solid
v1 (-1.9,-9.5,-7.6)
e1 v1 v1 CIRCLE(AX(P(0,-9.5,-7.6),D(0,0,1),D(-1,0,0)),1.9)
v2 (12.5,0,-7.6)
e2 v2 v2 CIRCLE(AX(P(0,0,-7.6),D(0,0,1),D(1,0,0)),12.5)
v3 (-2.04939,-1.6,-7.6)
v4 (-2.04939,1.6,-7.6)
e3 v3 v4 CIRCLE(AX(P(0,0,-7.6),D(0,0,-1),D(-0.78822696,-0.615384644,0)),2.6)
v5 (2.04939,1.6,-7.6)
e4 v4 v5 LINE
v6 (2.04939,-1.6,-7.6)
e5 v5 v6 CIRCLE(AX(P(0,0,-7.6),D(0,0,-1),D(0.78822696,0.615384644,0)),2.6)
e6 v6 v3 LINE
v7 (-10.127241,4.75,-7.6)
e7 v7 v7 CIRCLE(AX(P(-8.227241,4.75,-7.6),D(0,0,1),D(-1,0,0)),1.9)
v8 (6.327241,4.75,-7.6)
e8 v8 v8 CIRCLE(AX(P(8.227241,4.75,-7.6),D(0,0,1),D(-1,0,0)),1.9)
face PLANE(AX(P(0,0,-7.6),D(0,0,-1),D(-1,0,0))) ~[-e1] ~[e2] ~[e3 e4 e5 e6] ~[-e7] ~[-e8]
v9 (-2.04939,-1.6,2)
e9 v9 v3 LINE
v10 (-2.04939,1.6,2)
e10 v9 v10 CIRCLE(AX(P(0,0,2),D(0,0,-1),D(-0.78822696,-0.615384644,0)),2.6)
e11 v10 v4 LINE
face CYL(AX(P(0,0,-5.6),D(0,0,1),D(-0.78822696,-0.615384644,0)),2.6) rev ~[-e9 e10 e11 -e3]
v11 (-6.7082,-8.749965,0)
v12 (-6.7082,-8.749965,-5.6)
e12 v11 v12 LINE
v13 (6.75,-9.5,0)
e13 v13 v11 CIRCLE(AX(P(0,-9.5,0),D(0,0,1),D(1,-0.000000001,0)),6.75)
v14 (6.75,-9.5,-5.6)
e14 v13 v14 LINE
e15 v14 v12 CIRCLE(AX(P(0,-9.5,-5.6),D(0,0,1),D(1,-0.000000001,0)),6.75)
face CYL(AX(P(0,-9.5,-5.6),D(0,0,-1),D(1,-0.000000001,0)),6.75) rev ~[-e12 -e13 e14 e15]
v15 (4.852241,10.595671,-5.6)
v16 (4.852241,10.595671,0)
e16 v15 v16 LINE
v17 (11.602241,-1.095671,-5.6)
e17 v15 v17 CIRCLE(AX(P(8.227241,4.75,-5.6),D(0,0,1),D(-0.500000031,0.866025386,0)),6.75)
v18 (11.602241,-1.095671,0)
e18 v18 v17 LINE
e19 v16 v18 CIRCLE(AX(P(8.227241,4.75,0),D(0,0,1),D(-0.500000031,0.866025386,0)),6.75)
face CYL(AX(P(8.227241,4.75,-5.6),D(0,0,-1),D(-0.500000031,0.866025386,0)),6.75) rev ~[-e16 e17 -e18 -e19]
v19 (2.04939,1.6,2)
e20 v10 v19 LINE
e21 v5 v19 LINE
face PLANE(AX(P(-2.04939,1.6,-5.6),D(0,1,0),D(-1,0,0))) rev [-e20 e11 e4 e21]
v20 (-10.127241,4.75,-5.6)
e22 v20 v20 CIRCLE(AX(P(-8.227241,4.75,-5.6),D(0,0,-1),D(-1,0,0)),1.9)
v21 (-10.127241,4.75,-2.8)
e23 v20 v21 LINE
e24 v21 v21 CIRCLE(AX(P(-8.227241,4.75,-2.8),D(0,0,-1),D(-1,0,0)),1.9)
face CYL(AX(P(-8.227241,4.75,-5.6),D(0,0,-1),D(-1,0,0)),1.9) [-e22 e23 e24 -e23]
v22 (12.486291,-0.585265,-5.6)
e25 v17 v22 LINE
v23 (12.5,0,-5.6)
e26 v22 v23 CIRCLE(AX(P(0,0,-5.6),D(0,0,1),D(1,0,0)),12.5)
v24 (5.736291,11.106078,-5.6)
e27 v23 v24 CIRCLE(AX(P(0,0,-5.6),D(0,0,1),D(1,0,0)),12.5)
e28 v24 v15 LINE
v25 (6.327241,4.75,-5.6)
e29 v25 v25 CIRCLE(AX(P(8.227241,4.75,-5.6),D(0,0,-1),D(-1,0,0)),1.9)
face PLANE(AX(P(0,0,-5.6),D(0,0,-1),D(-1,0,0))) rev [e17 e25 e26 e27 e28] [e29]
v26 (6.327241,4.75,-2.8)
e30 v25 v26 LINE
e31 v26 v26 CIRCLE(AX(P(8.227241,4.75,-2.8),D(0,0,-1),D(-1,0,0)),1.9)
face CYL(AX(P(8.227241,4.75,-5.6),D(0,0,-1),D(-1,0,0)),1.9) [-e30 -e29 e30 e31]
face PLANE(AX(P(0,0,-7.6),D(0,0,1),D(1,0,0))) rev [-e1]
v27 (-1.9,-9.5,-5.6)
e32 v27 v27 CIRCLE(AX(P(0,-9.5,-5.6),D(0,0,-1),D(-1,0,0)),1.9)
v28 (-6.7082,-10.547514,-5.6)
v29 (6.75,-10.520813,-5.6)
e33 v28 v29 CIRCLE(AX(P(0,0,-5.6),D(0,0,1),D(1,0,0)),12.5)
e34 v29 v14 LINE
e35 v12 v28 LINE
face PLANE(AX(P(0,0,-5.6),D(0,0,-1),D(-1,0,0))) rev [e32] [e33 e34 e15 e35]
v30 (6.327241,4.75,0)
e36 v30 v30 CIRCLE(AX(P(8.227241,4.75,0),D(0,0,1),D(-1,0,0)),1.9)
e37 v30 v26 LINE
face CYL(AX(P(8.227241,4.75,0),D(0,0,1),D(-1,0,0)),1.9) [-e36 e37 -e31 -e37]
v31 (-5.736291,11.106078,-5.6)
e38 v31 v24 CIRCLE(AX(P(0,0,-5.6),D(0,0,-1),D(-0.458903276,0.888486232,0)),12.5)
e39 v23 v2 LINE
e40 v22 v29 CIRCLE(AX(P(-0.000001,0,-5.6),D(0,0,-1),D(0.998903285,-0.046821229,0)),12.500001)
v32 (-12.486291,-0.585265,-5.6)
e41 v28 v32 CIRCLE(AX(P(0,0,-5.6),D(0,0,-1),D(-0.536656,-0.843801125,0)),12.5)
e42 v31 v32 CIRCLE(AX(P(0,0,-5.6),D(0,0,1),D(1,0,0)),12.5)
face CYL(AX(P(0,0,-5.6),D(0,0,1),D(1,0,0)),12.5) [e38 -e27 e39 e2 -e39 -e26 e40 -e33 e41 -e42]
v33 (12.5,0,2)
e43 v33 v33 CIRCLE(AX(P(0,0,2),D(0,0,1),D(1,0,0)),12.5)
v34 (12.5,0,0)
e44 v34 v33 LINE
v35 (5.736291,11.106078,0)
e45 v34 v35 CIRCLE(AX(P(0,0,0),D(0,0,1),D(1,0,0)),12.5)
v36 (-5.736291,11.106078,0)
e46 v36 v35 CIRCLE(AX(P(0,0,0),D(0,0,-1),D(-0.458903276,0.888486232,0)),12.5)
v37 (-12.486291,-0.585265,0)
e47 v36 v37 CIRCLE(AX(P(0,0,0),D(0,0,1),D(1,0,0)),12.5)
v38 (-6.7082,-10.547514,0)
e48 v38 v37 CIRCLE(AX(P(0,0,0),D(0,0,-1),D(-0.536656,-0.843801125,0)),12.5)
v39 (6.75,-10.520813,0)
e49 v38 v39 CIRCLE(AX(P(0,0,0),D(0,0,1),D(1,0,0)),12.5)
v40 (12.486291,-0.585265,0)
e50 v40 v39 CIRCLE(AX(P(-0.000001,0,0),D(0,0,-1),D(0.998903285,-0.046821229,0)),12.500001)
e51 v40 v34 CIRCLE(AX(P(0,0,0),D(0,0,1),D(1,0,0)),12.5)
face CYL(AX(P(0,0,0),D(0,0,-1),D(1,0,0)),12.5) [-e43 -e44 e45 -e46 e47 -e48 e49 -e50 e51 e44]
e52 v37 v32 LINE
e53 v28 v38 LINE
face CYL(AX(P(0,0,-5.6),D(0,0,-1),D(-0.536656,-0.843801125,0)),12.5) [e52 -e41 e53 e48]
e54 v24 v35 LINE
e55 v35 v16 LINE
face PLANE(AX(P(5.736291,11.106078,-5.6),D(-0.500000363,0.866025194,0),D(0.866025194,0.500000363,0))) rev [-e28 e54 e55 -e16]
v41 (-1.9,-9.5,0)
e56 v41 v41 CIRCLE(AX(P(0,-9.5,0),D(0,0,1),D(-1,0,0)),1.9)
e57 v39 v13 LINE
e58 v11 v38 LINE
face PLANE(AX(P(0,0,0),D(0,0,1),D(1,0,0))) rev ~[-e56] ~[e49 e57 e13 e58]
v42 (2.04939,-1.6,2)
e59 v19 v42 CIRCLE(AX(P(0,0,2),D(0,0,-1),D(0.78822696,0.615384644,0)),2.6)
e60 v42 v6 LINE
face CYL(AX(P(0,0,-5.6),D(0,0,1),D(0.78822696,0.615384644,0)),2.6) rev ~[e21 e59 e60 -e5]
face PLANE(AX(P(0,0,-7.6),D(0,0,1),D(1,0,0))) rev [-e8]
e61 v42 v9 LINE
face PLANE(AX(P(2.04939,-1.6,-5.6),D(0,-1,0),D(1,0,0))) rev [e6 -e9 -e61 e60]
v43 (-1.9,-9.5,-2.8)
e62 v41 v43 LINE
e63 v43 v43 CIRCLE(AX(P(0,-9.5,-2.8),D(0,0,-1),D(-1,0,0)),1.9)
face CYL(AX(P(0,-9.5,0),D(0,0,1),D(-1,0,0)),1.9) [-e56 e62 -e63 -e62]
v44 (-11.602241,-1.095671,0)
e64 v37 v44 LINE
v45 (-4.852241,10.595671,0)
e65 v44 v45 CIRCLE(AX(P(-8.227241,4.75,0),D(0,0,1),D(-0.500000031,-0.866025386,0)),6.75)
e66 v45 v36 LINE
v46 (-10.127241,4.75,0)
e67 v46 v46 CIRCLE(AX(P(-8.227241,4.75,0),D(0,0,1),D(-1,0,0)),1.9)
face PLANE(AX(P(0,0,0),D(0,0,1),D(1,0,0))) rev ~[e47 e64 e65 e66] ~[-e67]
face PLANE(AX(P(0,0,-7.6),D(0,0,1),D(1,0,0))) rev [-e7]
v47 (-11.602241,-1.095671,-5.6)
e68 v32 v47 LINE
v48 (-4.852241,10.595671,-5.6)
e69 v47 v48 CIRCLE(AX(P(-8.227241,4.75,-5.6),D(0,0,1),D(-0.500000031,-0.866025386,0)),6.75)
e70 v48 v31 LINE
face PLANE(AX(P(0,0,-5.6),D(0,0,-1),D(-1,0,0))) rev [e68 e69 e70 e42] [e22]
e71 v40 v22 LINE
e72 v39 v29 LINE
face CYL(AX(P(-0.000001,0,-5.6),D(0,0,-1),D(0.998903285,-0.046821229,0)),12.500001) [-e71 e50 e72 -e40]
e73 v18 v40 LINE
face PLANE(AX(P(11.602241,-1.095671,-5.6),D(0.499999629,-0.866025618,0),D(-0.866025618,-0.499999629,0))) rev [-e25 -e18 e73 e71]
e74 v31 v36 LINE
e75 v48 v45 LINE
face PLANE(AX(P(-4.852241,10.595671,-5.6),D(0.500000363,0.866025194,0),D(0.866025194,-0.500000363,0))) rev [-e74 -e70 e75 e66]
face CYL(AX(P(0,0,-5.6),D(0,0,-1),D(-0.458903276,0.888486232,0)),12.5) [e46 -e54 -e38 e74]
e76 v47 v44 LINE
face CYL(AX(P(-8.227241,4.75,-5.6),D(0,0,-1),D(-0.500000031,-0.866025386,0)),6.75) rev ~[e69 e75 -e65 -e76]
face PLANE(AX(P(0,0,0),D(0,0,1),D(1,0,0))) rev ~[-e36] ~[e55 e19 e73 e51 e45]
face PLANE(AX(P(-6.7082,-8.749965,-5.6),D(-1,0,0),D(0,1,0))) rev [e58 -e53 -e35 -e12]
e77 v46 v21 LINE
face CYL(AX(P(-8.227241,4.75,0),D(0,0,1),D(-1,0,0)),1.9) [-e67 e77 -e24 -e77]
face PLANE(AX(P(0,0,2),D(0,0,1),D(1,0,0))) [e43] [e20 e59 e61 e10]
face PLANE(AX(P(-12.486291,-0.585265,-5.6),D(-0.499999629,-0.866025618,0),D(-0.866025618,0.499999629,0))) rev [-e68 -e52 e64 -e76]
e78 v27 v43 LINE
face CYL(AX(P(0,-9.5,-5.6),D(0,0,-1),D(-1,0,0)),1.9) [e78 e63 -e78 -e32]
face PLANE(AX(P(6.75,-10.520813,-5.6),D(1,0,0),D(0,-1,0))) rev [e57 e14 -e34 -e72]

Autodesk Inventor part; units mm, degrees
ref_plane "YZ Plane" through (0, 0, 0) normal (1, 0, 0) x (0, 1, 0)
ref_plane "XZ Plane" through (0, 0, 0) normal (0, 1, 0) x (-1, 0, 0)
ref_plane "XY Plane" through (0, 0, 0) normal (0, 0, 1) x (1, 0, 0)
sketch "Skizze3" plane through (0, 0, 0) normal (0, 0, 1) x (1, 0, 0)
  circle A0 centre (82.735856, -97.364718) radius 1.5
  circle A1 centre (87.344144, -89.642424) radius 2.777622
  circle A2 centre (0, 0) radius 12.5
  line L0 (0, -9.5) -> (-8.227241, 4.75)
  line L1 (-8.227241, 4.75) -> (8.227241, 4.75)
  line L2 (8.227241, 4.75) -> (0, -9.5)
  circle A3 centre (0, -9.5) radius 1.9
  circle A4 centre (8.227241, 4.75) radius 1.9
  circle A5 centre (-8.227241, 4.75) radius 1.9
  circle A6 centre (0, 0) radius 2.6
  line L3 (-2.04939, -1.6) -> (2.04939, -1.6)
  line L4 (-2.04939, 1.6) -> (2.04939, 1.6)
  circle A7 centre (8.227241, 4.75) radius 2 construction
  dimension "d10" = 25
  dimension "d11" = 9.5
  dimension "d12" = 3.8
  dimension "d13" = 3.8
  dimension "d14" = 3.8
  dimension "d15" = 5.2
  dimension "d16" = 1.6
  dimension "d17" = 1.6
sketch "Skizze3 outline for Extrusion3" plane through (0, 0, 0) normal (0, 0, 1) x (1, 0, 0)
  circle A0 centre (0, 0) radius 12.5
  circle A1 centre (0, -9.5) radius 1.9
  arc A2 (2.04939, 1.6) -> (2.04939, -1.6) centre (0, 0) cw
  line L0 (-2.04939, 1.6) -> (2.04939, 1.6)
  arc A3 (-2.04939, -1.6) -> (-2.04939, 1.6) centre (0, 0) cw
  line L1 (2.04939, -1.6) -> (-2.04939, -1.6)
  circle A4 centre (-8.227241, 4.75) radius 1.9
  circle A5 centre (8.227241, 4.75) radius 1.9
extrude "Extrusion3" add sketch "Skizze3 outline for Extrusion3" along normal blind 2
sketch "Skizze4" plane through (0, 0, 0) normal (0, 0, -1) x (-1, 0, 0)
  circle A0 centre (0, 0) radius 12.5
  circle A1 centre (8.227241, 4.75) radius 1.9
  circle A2 centre (0, -9.5) radius 1.9
  arc A3 (-2.04939, 1.6) -> (-2.04939, -1.6) centre (0, 0) ccw
  line L0 (2.04939, 1.6) -> (-2.04939, 1.6)
  arc A4 (2.04939, -1.6) -> (2.04939, 1.6) centre (0, 0) ccw
  line L1 (-2.04939, -1.6) -> (2.04939, -1.6)
  circle A5 centre (-8.227241, 4.75) radius 1.9
  circle A6 centre (0, -9.5) radius 6.75
  circle A7 centre (-8.227241, 4.75) radius 6.75
  circle A8 centre (8.227241, 4.75) radius 6.75
  line L2 (-6.75, -16.25) -> (6.7082, -16.25)
  line L3 (6.7082, -16.25) -> (6.7082, -8.749965)
  line L4 (6.7082, -8.749965) -> (-6.75, -8.749965)
  line L5 (-6.75, -8.749965) -> (-6.75, -16.25)
  line L6 (-6.75, -16.25) -> (6.7082, -8.749965) construction
  line L7 (6.7082, -16.25) -> (-6.75, -8.749965) construction
  line L8 (5.75657, -4.470671) -> (17.447913, 2.279329)
  line L9 (17.447913, 2.279329) -> (10.697913, 13.970671)
  line L10 (10.697913, 13.970671) -> (-0.99343, 7.220671)
  line L11 (-0.99343, 7.220671) -> (5.75657, -4.470671)
  line L12 (5.75657, -4.470671) -> (10.697913, 13.970671) construction
  line L13 (17.447913, 2.279329) -> (-0.99343, 7.220671) construction
  line L14 (0, 0) -> (8.227241, 4.75)
  line L15 (8.227241, 4.75) -> (0, 0)
  line L16 (0, 0) -> (-8.263885, 4.771156)
  line L17 (-5.75657, -4.470671) -> (0.99343, 7.220671)
  line L18 (0.99343, 7.220671) -> (-10.7712, 14.012984)
  line L19 (-10.7712, 14.012984) -> (-17.5212, 2.321641)
  line L20 (-17.5212, 2.321641) -> (-5.75657, -4.470671)
  line L21 (-5.75657, -4.470671) -> (-10.7712, 14.012984) construction
  line L22 (0.99343, 7.220671) -> (-17.5212, 2.321641) construction
  point P0 (5.826917, 11.058799)
  point P1 (12.490659, -0.483141)
  point P2 (-5.826917, 11.058799)
  point P3 (-12.490659, -0.483141)
  point P4 (-6.663742, -10.575658)
  point P5 (6.663742, -10.575658)
  point P6 (-0.0209, -12.499983)
  point P7 (-11.602241, -1.095671)
  point P8 (-12.486291, -0.585265)
  point P9 (-6.75, -10.520813)
  point P10 (-6.75, -9.5)
  point P11 (6.7082, -10.547514)
  point P12 (12.486291, -0.585265)
  point P13 (11.602241, -1.095671)
  point P14 (4.852241, 10.595671)
  point P15 (5.736291, 11.106078)
  point P16 (-5.736291, 11.106078)
  point P17 (-4.852241, 10.595671)
  dimension "d20" = 13.5
  dimension "d21" = 13.5
  dimension "d22" = 13.5
sketch "Skizze4 outline for Extrusion4" plane through (0, 0, 0) normal (0, 0, -1) x (-1, 0, 0)
  line L0 (-11.602241, -1.095671) -> (-12.486291, -0.585265)
  arc A0 (-4.852241, 10.595671) -> (-11.602241, -1.095671) centre (-8.227241, 4.75) cw
  arc A1 (-12.486291, -0.585265) -> (-6.75, -10.520813) centre (0, 0) ccw
  line L1 (-5.736291, 11.106078) -> (-4.852241, 10.595671)
  line L2 (-6.75, -10.520813) -> (-6.75, -9.5)
  arc A2 (5.736291, 11.106078) -> (-5.736291, 11.106078) centre (0, 0) ccw
  arc A3 (-6.75, -9.5) -> (6.7082, -8.749965) centre (0, -9.5) cw
  line L3 (4.852241, 10.595671) -> (5.736291, 11.106078)
  line L4 (6.7082, -8.749965) -> (6.7082, -10.547514)
  arc A4 (11.602241, -1.095671) -> (4.852241, 10.595671) centre (8.227241, 4.75) cw
  arc A5 (6.7082, -10.547514) -> (12.486291, -0.585265) centre (0, 0) ccw
  line L5 (12.486291, -0.585265) -> (11.602241, -1.095671)
  arc A6 (-2.04939, -1.6) -> (-2.04939, 1.6) centre (0, 0) cw
  line L6 (2.04939, -1.6) -> (-2.04939, -1.6)
  arc A7 (2.04939, 1.6) -> (2.04939, -1.6) centre (0, 0) cw
  line L7 (-2.04939, 1.6) -> (2.04939, 1.6)
extrude "Extrusion4" add sketch "Skizze4 outline for Extrusion4" along normal blind 2.8
sketch "Skizze9" plane through (0, 0, 0) normal (0, 0, -1) x (-1, 0, 0)
  circle A0 centre (-8.227241, 4.75) radius 1.9
  circle A1 centre (8.227241, 4.75) radius 1.9
  circle A2 centre (0, -9.5) radius 1.9
  point P0 (0, 0)
sketch "Skizze9 outline for Extrusion7" plane through (0, 0, 0) normal (0, 0, -1) x (-1, 0, 0)
  circle A0 centre (0, -9.5) radius 1.9
  circle A1 centre (8.227241, 4.75) radius 1.9
  circle A2 centre (-8.227241, 4.75) radius 1.9
extrude "Extrusion7" add sketch "Skizze9 outline for Extrusion7" along normal blind 2.8 and the other way blind 2
mirror "Spiegeln1" about plane through (0, 0.976243, -2.8) normal (0, 0, -1) of "Extrusion3", "Extrusion4", "Extrusion7"
equation "\"d12\" = d13"
equation "\"d14\" = d13"
equation "\"d17\" = d16"
equation "\"d20\" = d21"
equation "\"d22\" = d21"
properties part number "Pump_Rotatio_new."
